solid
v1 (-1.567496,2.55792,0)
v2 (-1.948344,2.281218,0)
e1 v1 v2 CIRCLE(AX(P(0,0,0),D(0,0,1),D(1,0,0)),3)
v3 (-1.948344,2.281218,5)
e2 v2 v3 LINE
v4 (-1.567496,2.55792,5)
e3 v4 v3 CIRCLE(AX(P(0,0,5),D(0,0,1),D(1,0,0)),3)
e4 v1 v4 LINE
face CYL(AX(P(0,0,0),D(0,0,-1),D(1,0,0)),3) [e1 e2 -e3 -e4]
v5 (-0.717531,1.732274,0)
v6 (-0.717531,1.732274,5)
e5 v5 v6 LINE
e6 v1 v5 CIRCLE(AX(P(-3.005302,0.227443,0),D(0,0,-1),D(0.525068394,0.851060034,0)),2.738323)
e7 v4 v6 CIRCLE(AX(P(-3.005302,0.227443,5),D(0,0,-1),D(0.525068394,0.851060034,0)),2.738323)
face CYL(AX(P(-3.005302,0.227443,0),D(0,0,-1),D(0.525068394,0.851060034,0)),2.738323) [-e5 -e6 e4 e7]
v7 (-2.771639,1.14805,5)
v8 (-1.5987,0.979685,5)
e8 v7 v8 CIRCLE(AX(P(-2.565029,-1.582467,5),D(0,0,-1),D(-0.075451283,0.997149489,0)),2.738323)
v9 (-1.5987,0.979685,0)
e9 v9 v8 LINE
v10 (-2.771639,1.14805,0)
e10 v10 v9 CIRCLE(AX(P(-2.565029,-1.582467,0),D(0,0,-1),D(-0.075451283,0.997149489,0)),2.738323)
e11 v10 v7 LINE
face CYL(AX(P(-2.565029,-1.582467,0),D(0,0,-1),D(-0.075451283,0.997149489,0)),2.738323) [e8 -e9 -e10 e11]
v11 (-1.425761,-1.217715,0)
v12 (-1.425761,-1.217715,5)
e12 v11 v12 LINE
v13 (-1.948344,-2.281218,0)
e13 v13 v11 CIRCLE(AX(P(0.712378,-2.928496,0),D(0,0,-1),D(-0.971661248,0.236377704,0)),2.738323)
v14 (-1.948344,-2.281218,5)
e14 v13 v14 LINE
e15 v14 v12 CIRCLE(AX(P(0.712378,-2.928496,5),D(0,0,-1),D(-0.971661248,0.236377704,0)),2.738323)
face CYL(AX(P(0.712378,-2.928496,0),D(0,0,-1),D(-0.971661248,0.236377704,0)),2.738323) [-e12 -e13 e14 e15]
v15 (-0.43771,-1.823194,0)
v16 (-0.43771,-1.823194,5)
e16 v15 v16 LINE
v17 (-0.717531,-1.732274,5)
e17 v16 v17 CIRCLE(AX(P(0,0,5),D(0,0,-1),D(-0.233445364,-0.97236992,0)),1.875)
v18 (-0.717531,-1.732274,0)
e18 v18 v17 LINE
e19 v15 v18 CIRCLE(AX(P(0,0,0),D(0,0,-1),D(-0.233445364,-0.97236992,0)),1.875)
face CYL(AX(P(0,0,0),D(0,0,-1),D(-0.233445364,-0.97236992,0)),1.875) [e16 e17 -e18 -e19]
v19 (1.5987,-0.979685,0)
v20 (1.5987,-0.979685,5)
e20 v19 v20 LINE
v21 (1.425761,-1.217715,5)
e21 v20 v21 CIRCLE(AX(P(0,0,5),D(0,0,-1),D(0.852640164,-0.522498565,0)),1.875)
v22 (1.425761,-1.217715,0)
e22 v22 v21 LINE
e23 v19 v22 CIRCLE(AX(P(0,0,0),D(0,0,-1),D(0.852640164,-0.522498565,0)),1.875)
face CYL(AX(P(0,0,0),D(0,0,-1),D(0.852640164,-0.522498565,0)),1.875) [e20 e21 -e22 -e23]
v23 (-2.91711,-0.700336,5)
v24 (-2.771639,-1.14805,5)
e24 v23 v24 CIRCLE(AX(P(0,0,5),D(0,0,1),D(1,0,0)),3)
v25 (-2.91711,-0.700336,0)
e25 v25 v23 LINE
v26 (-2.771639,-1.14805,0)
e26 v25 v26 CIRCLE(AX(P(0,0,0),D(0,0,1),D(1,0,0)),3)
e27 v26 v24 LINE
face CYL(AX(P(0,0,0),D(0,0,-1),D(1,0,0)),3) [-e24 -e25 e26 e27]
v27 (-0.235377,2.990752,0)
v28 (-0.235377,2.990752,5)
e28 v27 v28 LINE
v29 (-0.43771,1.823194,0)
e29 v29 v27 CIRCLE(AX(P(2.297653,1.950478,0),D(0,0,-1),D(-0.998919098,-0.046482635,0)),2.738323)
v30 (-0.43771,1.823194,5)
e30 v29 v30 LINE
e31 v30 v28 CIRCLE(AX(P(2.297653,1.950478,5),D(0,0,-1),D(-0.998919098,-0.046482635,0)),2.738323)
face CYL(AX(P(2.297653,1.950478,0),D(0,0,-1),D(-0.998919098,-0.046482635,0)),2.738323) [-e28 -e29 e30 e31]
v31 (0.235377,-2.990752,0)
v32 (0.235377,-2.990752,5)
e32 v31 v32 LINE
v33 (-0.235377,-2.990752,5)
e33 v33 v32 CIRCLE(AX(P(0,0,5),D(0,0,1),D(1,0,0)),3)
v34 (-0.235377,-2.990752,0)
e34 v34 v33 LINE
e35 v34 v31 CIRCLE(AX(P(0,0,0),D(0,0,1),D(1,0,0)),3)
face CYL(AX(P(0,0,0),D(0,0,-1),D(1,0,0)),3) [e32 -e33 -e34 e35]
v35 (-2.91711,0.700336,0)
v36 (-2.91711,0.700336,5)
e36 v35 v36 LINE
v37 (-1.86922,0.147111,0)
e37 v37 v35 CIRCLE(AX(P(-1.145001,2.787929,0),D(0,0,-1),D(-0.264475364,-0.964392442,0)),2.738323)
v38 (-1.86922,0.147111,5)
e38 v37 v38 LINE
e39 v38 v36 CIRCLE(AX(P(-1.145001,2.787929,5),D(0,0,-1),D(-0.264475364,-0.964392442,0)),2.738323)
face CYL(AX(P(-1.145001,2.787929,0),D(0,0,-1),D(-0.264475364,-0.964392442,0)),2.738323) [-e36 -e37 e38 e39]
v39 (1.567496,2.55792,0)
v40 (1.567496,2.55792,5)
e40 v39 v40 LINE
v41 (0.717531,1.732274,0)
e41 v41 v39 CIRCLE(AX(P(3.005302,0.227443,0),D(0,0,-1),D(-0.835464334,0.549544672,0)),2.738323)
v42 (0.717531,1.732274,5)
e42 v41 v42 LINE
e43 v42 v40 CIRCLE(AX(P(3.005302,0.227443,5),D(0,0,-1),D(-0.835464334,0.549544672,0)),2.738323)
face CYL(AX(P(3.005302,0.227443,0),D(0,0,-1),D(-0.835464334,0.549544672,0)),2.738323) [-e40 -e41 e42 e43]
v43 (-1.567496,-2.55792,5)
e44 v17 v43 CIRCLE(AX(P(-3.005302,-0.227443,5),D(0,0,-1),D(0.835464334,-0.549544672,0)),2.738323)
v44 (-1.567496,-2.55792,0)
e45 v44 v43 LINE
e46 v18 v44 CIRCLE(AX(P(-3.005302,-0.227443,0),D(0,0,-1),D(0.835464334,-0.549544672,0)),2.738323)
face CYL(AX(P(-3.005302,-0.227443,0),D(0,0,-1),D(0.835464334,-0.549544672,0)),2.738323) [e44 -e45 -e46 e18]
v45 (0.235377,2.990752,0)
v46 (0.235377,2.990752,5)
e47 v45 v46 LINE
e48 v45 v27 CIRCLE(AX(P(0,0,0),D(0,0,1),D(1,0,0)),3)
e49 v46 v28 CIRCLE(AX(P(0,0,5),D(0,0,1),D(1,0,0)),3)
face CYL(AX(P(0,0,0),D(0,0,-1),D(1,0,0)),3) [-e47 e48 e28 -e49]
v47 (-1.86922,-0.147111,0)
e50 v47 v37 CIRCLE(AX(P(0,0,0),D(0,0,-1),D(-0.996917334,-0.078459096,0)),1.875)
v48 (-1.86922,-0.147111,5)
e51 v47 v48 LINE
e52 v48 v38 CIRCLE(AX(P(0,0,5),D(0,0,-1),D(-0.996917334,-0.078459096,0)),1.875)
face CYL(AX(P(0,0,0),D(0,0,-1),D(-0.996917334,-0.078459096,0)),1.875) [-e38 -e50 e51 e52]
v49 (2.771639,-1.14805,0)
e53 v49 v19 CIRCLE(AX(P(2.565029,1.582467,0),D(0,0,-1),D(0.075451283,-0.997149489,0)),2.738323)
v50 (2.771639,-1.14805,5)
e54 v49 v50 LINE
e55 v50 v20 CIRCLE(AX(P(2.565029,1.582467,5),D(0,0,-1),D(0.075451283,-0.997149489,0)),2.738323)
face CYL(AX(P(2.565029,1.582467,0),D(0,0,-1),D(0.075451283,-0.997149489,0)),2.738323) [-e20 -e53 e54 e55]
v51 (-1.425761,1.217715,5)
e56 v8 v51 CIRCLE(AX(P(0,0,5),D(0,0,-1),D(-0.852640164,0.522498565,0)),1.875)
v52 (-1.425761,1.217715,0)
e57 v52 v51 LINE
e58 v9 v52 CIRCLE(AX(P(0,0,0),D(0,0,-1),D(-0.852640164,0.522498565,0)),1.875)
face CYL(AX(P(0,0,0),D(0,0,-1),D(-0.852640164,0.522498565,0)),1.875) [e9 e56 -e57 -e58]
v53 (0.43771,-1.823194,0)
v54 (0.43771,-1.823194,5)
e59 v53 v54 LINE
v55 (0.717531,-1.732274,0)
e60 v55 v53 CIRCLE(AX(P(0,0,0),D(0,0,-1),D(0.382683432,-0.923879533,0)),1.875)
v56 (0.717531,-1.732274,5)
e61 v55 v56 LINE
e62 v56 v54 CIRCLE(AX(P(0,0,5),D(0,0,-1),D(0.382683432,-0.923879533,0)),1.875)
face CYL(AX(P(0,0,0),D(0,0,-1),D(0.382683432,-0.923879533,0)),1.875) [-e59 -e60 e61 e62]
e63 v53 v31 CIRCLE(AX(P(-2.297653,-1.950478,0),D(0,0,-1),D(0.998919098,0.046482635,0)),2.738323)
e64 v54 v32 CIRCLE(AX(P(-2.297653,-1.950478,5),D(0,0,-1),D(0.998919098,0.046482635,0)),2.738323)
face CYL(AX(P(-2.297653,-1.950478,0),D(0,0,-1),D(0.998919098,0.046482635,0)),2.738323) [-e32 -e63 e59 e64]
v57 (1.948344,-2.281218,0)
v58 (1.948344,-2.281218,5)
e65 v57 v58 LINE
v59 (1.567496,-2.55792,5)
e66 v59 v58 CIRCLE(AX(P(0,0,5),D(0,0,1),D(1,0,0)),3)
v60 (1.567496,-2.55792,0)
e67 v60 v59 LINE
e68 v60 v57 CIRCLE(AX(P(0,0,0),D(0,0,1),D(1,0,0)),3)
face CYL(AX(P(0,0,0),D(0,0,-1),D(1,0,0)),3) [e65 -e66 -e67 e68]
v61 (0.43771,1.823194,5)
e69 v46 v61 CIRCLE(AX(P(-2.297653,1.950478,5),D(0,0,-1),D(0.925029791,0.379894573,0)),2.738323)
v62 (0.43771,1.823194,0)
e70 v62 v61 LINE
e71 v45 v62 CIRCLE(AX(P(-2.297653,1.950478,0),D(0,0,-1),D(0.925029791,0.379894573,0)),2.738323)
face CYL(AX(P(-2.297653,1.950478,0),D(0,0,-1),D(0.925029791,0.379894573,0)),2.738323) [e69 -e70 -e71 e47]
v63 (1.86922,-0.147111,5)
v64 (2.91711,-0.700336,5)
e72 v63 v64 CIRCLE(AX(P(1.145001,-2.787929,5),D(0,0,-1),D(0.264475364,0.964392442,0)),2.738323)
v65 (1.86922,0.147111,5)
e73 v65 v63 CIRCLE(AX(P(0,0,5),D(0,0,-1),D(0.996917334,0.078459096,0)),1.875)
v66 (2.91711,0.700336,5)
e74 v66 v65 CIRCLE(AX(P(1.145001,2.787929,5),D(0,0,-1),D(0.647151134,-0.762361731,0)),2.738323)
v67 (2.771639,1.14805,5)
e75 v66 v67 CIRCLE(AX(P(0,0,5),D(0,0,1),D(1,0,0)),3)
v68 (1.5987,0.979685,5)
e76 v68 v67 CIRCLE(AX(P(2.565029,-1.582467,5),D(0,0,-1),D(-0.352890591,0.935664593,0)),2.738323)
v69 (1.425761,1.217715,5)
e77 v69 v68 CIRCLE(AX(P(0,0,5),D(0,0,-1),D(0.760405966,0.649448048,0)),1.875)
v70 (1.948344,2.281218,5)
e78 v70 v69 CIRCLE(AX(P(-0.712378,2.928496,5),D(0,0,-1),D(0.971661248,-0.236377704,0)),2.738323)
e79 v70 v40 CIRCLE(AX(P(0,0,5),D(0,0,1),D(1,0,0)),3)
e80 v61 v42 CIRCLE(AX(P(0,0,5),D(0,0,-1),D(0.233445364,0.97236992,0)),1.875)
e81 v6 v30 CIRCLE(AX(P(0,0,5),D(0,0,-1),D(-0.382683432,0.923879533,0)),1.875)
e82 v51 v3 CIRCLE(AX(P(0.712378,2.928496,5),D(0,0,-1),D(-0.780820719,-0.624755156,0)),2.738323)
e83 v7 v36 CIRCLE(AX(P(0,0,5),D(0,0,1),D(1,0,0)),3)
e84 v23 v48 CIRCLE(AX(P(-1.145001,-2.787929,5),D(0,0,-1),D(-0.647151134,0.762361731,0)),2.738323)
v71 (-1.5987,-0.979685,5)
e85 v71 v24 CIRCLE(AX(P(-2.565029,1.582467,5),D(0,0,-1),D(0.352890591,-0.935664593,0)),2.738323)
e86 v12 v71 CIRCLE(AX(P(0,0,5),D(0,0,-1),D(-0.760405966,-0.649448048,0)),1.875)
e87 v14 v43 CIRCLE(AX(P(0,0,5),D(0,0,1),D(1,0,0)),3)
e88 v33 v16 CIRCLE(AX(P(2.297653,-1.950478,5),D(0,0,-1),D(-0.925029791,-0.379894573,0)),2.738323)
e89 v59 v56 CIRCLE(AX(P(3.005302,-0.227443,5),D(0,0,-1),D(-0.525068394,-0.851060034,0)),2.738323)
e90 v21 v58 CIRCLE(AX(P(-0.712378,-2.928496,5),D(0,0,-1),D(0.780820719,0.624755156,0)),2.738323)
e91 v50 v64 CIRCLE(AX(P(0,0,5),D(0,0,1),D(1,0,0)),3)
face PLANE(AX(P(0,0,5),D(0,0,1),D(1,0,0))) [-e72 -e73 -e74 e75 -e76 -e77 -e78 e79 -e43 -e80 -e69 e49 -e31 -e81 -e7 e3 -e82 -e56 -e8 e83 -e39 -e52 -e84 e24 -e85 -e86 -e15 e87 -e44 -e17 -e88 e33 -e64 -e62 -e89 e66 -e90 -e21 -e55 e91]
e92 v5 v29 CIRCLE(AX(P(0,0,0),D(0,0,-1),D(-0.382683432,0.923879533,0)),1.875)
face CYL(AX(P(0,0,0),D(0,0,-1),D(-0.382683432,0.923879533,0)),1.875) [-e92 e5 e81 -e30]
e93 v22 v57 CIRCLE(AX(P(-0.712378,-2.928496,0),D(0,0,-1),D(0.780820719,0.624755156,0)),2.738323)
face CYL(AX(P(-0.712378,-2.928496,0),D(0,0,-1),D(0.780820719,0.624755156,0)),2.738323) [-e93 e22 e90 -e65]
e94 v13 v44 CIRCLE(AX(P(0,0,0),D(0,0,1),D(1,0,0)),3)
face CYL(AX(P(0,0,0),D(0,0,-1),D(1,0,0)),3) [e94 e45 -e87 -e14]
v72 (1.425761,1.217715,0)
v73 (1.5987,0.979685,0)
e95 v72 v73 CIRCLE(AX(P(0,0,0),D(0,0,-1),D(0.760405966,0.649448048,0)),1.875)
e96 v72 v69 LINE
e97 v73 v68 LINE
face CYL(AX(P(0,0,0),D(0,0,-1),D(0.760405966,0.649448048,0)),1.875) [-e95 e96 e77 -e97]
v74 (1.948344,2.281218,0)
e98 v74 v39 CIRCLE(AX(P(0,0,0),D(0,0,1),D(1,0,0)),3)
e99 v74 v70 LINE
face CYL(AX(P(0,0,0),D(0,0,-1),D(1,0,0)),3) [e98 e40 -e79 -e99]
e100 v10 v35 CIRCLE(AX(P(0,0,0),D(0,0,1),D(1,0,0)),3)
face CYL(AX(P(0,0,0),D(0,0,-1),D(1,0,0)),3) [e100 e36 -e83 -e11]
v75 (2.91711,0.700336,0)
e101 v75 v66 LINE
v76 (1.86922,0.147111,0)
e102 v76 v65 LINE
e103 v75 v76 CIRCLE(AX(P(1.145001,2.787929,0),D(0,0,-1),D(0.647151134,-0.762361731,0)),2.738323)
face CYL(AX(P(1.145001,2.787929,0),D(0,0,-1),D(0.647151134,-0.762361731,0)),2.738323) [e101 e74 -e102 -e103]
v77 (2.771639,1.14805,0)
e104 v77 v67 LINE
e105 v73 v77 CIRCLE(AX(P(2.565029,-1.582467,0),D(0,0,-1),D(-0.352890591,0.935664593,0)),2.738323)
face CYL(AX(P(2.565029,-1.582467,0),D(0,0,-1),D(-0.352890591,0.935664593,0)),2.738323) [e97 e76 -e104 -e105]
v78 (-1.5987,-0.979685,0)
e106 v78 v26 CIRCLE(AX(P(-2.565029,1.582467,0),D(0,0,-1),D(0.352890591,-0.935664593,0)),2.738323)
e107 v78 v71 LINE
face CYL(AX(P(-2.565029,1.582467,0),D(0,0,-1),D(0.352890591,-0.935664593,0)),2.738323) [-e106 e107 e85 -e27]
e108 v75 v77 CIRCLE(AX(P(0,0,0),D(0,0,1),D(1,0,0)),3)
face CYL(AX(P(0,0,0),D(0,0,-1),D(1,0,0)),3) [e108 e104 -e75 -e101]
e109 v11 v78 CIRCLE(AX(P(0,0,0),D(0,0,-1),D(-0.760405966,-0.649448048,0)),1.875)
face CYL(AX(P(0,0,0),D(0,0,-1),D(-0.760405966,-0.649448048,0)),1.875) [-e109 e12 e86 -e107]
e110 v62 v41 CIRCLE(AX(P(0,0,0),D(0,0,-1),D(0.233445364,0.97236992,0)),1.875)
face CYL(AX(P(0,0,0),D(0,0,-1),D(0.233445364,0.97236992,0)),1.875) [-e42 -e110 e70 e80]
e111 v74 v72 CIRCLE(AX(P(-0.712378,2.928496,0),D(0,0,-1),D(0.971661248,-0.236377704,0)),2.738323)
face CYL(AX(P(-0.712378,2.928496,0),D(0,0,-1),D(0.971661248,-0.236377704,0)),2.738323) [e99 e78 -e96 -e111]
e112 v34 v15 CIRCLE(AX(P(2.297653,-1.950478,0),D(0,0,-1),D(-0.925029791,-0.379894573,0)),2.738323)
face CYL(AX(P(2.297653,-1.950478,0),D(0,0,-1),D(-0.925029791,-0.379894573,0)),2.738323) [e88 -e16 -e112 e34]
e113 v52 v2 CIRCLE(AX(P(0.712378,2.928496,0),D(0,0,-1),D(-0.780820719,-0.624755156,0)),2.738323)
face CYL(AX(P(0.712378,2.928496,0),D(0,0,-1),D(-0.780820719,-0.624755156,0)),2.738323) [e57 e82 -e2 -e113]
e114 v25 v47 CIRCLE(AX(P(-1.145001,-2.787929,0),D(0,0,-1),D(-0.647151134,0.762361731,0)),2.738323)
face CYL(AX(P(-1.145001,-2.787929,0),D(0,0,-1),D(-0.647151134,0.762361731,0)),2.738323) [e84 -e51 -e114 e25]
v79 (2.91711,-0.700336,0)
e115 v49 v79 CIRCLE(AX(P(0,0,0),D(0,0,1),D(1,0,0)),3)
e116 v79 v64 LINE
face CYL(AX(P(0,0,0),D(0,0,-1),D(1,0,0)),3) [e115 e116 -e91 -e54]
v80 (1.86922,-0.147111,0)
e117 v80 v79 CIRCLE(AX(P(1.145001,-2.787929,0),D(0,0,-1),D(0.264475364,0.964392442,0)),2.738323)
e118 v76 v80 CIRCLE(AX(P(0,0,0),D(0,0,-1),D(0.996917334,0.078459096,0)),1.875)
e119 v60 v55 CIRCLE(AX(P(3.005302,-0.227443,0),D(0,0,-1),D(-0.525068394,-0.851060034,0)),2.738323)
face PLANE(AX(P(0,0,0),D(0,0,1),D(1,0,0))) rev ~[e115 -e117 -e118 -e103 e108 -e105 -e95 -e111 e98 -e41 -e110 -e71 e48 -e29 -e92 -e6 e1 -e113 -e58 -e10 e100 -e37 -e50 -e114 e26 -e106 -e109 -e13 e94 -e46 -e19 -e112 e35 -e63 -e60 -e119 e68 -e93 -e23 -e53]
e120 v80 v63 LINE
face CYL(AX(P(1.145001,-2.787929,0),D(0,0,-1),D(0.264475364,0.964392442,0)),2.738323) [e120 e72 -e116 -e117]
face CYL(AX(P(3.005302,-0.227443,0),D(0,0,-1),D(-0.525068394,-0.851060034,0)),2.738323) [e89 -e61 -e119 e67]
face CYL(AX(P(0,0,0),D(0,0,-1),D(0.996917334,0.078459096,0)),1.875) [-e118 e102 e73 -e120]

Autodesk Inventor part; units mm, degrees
sketch "Sketch1" plane through (0, 0, 0) normal (0, 0, 1) x (1, 0, 0)
  circle A0 centre (0, 0) radius 3
  dimension "d0" = 6
extrude "Extrusion1" add sketch "Sketch1" along normal blind 5
ref_plane "Work Plane2" through (0, 0, 2.5) normal (0, 0, 1) x (1, 0, 0)
sketch "Sketch2" plane through (0, 0, 0) normal (0, 0, -1) x (-1, 0, 0)
  circle A0 centre (0, 0) radius 3 projected
  circle A1 centre (0, 0) radius 2.5
  dimension "d3" = 5
surface extrude "Pitch Diameter" sketch "Sketch2" against normal through all shown no curves A1
ref_plane "Work Plane8" through (0, 0, 0) normal (0.9510565, 0.309017, 0) x (0, 0, 1)
ref_plane "Work Plane9" through (0, 0, 0) normal (1, 0, 0) x (0, 1, 0)
spur gear teeth "Spur Gear" teeth 10 pitch diameter 5 tip diameter 6 root diameter 3.75 face width 5 start plane through (0, 0, 0) normal (0, 0, -1) x (-1, 0, 0)
equation "\"d0\" = da_da"
equation "\"d1\" = da_b"
equation "\"d3\" = da_dw"
equation "\"d16\" = da_aw"
equation "\"d43\" = da_aw"
equation "\"d46\" = da_aw"
equation "\"da_da\" = 6"
equation "\"da_b\" = 5"
equation "\"da_dw\" = 5"
equation "\"da_aw\" = 12"
properties part number "Spur Gear1" material "Steel"
